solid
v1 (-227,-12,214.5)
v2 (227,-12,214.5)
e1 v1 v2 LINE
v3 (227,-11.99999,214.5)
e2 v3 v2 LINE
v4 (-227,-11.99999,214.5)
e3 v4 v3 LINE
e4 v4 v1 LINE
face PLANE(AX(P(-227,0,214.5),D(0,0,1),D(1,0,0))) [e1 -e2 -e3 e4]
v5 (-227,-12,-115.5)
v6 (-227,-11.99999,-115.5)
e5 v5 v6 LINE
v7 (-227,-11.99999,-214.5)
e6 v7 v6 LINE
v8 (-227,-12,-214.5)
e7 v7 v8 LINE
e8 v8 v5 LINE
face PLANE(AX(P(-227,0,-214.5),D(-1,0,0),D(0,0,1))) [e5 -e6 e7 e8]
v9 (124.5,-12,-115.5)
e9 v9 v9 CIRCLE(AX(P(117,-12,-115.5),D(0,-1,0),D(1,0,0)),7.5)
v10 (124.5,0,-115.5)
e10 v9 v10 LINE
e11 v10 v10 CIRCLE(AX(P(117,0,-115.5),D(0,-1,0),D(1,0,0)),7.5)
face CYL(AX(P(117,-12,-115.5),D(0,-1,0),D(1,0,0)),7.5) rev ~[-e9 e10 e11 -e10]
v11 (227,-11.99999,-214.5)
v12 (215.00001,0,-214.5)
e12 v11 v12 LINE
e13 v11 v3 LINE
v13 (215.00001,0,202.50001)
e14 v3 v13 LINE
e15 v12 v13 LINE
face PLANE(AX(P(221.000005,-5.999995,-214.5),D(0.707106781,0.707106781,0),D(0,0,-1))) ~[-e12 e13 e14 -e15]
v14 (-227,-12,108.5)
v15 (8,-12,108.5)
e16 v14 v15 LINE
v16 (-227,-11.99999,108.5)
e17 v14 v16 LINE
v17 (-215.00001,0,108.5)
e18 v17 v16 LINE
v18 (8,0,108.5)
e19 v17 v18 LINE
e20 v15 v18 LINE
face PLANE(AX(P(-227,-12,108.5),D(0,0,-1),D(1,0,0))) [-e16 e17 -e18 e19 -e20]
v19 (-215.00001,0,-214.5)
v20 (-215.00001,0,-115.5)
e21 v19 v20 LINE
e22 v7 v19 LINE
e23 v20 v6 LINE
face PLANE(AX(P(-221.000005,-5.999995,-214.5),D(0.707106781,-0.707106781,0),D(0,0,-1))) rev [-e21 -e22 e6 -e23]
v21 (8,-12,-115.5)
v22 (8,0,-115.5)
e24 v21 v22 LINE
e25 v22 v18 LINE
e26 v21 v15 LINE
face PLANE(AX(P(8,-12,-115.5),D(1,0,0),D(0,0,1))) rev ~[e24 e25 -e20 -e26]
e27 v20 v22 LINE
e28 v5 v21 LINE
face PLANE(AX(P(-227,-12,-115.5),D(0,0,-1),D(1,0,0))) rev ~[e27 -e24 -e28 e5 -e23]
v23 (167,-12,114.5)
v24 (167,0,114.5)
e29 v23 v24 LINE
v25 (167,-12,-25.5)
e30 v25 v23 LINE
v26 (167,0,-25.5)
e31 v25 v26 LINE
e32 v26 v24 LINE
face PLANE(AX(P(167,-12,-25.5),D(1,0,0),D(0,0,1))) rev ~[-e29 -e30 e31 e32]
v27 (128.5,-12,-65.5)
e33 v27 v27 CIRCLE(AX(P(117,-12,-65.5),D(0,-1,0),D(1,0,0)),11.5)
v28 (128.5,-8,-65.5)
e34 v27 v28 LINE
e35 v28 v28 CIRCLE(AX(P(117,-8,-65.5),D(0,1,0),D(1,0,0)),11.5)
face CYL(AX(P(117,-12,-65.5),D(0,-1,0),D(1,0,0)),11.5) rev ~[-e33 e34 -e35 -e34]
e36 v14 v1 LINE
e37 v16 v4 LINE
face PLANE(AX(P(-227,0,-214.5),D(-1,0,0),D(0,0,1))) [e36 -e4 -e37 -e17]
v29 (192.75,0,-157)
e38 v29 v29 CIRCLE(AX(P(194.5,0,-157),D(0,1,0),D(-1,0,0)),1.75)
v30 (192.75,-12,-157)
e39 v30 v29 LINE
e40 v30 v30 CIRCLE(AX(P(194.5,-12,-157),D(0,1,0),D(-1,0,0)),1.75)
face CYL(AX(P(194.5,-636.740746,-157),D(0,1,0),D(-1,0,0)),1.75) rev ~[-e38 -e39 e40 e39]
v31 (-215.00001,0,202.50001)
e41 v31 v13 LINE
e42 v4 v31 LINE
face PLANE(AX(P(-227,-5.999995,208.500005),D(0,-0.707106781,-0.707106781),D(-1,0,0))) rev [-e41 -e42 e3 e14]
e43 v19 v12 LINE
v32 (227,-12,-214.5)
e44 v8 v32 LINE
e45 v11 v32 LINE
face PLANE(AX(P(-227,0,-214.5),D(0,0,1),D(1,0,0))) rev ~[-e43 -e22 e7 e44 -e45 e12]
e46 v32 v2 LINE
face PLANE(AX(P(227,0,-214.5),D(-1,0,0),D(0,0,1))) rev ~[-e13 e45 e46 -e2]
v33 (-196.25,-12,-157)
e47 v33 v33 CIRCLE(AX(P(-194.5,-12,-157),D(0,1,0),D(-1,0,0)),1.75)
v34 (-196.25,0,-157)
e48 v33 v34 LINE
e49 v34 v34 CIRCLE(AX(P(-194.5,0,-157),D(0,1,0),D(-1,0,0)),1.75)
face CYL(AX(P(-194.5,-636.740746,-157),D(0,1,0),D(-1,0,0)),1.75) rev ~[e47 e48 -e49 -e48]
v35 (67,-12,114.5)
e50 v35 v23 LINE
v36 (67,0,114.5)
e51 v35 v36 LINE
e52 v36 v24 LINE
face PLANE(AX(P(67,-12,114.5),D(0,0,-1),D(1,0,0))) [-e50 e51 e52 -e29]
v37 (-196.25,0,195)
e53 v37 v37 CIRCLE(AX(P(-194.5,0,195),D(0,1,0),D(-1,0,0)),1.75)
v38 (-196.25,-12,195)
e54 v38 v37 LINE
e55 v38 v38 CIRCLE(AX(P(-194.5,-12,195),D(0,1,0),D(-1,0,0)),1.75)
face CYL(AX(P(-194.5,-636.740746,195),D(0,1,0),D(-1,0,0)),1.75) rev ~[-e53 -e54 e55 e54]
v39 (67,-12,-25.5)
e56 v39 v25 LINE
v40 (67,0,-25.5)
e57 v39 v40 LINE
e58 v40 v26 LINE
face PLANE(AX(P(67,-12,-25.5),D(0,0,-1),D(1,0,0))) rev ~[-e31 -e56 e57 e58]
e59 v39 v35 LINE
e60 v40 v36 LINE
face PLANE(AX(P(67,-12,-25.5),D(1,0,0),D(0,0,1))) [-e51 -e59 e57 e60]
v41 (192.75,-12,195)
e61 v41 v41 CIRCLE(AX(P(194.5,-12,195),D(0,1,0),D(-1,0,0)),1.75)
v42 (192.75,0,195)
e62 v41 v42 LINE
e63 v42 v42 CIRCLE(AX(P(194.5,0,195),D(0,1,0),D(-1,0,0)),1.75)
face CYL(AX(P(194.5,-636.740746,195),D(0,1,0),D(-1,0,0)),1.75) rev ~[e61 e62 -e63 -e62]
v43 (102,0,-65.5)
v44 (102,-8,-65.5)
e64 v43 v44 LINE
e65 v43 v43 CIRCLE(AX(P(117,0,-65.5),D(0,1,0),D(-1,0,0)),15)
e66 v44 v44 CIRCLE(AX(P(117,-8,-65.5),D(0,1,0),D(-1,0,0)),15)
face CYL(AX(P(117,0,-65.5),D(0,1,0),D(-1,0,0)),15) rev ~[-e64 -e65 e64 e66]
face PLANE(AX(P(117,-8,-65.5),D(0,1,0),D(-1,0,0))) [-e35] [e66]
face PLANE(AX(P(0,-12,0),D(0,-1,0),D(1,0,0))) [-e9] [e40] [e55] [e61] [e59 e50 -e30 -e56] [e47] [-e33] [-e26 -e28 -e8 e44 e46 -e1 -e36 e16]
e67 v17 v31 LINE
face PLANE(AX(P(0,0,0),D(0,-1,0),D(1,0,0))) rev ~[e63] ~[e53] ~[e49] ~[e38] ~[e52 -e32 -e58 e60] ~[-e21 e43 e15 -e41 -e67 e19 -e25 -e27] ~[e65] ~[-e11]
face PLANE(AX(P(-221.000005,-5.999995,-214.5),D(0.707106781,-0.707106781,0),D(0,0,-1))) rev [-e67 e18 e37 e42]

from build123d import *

# Parameters (mm, degrees)
F0_W     = 454
F0_H     = 429
F1_DEPTH = 12
F2_SIZE  = 11.99999
F3_W     = 235
F3_H     = 224
F3_W_2   = 100
F3_H_2   = 140
F3_R     = 11.5
F3_R_2   = 7.5
F4_DEPTH = 25
F6_D     = 3.5
F7_R     = 15
F7_R_2   = 11.5
F8_DEPTH = 8


# Not quite as in the source:
# - a fillet or chamfer is up to 0.001 mm smaller than in the source, because OpenCascade refuses the exact size


with BuildPart() as f1:
    # F0 (on Front) → F1 (new body)
    with BuildSketch(Plane.XZ):
        Rectangle(F0_W, F0_H)
    extrude(amount=F1_DEPTH)

    # F2 (size 12 in the source; OpenCascade refuses exactly that, so slightly less here)
    f2_edges = [f1.edges().sort_by_distance(p)[0] for p in [
        (227, 0, 0),
        (-227, 0, 0),
        (0, 0, 214.5),
    ]]
    chamfer(f2_edges, length=F2_SIZE)

    # F3 (on face) → F4 (cut)
    with BuildSketch(Plane.XZ.offset(12)):
        with Locations((-109.5, -3.5)):
            Rectangle(F3_W, F3_H)
        with Locations((117, 44.5)):
            Rectangle(F3_W_2, F3_H_2)
        with Locations((117, -65.5)):
            Circle(F3_R)
        with Locations((117, -115.5)):
            Circle(F3_R_2)
    extrude(amount=-F4_DEPTH, mode=Mode.SUBTRACT)

    # F6 (through all)
    with Locations(Plane.XZ.offset(12)):
        with Locations((-194.5, 195), (194.5, 195), (194.5, -157), (-194.5, -157)):
            Hole(F6_D / 2)

    # F7 (on face) → F8 (cut)
    with BuildSketch(Plane(origin=(0, 0, 0), x_dir=(-1, 0, 0), z_dir=(0, 1, 0))):
        with Locations((-117, -65.5)):
            Circle(F7_R)
        with Locations((-117, -65.5)):
            Circle(F7_R_2, mode=Mode.SUBTRACT)
    extrude(amount=-F8_DEPTH, mode=Mode.SUBTRACT)


solid = f1.part
